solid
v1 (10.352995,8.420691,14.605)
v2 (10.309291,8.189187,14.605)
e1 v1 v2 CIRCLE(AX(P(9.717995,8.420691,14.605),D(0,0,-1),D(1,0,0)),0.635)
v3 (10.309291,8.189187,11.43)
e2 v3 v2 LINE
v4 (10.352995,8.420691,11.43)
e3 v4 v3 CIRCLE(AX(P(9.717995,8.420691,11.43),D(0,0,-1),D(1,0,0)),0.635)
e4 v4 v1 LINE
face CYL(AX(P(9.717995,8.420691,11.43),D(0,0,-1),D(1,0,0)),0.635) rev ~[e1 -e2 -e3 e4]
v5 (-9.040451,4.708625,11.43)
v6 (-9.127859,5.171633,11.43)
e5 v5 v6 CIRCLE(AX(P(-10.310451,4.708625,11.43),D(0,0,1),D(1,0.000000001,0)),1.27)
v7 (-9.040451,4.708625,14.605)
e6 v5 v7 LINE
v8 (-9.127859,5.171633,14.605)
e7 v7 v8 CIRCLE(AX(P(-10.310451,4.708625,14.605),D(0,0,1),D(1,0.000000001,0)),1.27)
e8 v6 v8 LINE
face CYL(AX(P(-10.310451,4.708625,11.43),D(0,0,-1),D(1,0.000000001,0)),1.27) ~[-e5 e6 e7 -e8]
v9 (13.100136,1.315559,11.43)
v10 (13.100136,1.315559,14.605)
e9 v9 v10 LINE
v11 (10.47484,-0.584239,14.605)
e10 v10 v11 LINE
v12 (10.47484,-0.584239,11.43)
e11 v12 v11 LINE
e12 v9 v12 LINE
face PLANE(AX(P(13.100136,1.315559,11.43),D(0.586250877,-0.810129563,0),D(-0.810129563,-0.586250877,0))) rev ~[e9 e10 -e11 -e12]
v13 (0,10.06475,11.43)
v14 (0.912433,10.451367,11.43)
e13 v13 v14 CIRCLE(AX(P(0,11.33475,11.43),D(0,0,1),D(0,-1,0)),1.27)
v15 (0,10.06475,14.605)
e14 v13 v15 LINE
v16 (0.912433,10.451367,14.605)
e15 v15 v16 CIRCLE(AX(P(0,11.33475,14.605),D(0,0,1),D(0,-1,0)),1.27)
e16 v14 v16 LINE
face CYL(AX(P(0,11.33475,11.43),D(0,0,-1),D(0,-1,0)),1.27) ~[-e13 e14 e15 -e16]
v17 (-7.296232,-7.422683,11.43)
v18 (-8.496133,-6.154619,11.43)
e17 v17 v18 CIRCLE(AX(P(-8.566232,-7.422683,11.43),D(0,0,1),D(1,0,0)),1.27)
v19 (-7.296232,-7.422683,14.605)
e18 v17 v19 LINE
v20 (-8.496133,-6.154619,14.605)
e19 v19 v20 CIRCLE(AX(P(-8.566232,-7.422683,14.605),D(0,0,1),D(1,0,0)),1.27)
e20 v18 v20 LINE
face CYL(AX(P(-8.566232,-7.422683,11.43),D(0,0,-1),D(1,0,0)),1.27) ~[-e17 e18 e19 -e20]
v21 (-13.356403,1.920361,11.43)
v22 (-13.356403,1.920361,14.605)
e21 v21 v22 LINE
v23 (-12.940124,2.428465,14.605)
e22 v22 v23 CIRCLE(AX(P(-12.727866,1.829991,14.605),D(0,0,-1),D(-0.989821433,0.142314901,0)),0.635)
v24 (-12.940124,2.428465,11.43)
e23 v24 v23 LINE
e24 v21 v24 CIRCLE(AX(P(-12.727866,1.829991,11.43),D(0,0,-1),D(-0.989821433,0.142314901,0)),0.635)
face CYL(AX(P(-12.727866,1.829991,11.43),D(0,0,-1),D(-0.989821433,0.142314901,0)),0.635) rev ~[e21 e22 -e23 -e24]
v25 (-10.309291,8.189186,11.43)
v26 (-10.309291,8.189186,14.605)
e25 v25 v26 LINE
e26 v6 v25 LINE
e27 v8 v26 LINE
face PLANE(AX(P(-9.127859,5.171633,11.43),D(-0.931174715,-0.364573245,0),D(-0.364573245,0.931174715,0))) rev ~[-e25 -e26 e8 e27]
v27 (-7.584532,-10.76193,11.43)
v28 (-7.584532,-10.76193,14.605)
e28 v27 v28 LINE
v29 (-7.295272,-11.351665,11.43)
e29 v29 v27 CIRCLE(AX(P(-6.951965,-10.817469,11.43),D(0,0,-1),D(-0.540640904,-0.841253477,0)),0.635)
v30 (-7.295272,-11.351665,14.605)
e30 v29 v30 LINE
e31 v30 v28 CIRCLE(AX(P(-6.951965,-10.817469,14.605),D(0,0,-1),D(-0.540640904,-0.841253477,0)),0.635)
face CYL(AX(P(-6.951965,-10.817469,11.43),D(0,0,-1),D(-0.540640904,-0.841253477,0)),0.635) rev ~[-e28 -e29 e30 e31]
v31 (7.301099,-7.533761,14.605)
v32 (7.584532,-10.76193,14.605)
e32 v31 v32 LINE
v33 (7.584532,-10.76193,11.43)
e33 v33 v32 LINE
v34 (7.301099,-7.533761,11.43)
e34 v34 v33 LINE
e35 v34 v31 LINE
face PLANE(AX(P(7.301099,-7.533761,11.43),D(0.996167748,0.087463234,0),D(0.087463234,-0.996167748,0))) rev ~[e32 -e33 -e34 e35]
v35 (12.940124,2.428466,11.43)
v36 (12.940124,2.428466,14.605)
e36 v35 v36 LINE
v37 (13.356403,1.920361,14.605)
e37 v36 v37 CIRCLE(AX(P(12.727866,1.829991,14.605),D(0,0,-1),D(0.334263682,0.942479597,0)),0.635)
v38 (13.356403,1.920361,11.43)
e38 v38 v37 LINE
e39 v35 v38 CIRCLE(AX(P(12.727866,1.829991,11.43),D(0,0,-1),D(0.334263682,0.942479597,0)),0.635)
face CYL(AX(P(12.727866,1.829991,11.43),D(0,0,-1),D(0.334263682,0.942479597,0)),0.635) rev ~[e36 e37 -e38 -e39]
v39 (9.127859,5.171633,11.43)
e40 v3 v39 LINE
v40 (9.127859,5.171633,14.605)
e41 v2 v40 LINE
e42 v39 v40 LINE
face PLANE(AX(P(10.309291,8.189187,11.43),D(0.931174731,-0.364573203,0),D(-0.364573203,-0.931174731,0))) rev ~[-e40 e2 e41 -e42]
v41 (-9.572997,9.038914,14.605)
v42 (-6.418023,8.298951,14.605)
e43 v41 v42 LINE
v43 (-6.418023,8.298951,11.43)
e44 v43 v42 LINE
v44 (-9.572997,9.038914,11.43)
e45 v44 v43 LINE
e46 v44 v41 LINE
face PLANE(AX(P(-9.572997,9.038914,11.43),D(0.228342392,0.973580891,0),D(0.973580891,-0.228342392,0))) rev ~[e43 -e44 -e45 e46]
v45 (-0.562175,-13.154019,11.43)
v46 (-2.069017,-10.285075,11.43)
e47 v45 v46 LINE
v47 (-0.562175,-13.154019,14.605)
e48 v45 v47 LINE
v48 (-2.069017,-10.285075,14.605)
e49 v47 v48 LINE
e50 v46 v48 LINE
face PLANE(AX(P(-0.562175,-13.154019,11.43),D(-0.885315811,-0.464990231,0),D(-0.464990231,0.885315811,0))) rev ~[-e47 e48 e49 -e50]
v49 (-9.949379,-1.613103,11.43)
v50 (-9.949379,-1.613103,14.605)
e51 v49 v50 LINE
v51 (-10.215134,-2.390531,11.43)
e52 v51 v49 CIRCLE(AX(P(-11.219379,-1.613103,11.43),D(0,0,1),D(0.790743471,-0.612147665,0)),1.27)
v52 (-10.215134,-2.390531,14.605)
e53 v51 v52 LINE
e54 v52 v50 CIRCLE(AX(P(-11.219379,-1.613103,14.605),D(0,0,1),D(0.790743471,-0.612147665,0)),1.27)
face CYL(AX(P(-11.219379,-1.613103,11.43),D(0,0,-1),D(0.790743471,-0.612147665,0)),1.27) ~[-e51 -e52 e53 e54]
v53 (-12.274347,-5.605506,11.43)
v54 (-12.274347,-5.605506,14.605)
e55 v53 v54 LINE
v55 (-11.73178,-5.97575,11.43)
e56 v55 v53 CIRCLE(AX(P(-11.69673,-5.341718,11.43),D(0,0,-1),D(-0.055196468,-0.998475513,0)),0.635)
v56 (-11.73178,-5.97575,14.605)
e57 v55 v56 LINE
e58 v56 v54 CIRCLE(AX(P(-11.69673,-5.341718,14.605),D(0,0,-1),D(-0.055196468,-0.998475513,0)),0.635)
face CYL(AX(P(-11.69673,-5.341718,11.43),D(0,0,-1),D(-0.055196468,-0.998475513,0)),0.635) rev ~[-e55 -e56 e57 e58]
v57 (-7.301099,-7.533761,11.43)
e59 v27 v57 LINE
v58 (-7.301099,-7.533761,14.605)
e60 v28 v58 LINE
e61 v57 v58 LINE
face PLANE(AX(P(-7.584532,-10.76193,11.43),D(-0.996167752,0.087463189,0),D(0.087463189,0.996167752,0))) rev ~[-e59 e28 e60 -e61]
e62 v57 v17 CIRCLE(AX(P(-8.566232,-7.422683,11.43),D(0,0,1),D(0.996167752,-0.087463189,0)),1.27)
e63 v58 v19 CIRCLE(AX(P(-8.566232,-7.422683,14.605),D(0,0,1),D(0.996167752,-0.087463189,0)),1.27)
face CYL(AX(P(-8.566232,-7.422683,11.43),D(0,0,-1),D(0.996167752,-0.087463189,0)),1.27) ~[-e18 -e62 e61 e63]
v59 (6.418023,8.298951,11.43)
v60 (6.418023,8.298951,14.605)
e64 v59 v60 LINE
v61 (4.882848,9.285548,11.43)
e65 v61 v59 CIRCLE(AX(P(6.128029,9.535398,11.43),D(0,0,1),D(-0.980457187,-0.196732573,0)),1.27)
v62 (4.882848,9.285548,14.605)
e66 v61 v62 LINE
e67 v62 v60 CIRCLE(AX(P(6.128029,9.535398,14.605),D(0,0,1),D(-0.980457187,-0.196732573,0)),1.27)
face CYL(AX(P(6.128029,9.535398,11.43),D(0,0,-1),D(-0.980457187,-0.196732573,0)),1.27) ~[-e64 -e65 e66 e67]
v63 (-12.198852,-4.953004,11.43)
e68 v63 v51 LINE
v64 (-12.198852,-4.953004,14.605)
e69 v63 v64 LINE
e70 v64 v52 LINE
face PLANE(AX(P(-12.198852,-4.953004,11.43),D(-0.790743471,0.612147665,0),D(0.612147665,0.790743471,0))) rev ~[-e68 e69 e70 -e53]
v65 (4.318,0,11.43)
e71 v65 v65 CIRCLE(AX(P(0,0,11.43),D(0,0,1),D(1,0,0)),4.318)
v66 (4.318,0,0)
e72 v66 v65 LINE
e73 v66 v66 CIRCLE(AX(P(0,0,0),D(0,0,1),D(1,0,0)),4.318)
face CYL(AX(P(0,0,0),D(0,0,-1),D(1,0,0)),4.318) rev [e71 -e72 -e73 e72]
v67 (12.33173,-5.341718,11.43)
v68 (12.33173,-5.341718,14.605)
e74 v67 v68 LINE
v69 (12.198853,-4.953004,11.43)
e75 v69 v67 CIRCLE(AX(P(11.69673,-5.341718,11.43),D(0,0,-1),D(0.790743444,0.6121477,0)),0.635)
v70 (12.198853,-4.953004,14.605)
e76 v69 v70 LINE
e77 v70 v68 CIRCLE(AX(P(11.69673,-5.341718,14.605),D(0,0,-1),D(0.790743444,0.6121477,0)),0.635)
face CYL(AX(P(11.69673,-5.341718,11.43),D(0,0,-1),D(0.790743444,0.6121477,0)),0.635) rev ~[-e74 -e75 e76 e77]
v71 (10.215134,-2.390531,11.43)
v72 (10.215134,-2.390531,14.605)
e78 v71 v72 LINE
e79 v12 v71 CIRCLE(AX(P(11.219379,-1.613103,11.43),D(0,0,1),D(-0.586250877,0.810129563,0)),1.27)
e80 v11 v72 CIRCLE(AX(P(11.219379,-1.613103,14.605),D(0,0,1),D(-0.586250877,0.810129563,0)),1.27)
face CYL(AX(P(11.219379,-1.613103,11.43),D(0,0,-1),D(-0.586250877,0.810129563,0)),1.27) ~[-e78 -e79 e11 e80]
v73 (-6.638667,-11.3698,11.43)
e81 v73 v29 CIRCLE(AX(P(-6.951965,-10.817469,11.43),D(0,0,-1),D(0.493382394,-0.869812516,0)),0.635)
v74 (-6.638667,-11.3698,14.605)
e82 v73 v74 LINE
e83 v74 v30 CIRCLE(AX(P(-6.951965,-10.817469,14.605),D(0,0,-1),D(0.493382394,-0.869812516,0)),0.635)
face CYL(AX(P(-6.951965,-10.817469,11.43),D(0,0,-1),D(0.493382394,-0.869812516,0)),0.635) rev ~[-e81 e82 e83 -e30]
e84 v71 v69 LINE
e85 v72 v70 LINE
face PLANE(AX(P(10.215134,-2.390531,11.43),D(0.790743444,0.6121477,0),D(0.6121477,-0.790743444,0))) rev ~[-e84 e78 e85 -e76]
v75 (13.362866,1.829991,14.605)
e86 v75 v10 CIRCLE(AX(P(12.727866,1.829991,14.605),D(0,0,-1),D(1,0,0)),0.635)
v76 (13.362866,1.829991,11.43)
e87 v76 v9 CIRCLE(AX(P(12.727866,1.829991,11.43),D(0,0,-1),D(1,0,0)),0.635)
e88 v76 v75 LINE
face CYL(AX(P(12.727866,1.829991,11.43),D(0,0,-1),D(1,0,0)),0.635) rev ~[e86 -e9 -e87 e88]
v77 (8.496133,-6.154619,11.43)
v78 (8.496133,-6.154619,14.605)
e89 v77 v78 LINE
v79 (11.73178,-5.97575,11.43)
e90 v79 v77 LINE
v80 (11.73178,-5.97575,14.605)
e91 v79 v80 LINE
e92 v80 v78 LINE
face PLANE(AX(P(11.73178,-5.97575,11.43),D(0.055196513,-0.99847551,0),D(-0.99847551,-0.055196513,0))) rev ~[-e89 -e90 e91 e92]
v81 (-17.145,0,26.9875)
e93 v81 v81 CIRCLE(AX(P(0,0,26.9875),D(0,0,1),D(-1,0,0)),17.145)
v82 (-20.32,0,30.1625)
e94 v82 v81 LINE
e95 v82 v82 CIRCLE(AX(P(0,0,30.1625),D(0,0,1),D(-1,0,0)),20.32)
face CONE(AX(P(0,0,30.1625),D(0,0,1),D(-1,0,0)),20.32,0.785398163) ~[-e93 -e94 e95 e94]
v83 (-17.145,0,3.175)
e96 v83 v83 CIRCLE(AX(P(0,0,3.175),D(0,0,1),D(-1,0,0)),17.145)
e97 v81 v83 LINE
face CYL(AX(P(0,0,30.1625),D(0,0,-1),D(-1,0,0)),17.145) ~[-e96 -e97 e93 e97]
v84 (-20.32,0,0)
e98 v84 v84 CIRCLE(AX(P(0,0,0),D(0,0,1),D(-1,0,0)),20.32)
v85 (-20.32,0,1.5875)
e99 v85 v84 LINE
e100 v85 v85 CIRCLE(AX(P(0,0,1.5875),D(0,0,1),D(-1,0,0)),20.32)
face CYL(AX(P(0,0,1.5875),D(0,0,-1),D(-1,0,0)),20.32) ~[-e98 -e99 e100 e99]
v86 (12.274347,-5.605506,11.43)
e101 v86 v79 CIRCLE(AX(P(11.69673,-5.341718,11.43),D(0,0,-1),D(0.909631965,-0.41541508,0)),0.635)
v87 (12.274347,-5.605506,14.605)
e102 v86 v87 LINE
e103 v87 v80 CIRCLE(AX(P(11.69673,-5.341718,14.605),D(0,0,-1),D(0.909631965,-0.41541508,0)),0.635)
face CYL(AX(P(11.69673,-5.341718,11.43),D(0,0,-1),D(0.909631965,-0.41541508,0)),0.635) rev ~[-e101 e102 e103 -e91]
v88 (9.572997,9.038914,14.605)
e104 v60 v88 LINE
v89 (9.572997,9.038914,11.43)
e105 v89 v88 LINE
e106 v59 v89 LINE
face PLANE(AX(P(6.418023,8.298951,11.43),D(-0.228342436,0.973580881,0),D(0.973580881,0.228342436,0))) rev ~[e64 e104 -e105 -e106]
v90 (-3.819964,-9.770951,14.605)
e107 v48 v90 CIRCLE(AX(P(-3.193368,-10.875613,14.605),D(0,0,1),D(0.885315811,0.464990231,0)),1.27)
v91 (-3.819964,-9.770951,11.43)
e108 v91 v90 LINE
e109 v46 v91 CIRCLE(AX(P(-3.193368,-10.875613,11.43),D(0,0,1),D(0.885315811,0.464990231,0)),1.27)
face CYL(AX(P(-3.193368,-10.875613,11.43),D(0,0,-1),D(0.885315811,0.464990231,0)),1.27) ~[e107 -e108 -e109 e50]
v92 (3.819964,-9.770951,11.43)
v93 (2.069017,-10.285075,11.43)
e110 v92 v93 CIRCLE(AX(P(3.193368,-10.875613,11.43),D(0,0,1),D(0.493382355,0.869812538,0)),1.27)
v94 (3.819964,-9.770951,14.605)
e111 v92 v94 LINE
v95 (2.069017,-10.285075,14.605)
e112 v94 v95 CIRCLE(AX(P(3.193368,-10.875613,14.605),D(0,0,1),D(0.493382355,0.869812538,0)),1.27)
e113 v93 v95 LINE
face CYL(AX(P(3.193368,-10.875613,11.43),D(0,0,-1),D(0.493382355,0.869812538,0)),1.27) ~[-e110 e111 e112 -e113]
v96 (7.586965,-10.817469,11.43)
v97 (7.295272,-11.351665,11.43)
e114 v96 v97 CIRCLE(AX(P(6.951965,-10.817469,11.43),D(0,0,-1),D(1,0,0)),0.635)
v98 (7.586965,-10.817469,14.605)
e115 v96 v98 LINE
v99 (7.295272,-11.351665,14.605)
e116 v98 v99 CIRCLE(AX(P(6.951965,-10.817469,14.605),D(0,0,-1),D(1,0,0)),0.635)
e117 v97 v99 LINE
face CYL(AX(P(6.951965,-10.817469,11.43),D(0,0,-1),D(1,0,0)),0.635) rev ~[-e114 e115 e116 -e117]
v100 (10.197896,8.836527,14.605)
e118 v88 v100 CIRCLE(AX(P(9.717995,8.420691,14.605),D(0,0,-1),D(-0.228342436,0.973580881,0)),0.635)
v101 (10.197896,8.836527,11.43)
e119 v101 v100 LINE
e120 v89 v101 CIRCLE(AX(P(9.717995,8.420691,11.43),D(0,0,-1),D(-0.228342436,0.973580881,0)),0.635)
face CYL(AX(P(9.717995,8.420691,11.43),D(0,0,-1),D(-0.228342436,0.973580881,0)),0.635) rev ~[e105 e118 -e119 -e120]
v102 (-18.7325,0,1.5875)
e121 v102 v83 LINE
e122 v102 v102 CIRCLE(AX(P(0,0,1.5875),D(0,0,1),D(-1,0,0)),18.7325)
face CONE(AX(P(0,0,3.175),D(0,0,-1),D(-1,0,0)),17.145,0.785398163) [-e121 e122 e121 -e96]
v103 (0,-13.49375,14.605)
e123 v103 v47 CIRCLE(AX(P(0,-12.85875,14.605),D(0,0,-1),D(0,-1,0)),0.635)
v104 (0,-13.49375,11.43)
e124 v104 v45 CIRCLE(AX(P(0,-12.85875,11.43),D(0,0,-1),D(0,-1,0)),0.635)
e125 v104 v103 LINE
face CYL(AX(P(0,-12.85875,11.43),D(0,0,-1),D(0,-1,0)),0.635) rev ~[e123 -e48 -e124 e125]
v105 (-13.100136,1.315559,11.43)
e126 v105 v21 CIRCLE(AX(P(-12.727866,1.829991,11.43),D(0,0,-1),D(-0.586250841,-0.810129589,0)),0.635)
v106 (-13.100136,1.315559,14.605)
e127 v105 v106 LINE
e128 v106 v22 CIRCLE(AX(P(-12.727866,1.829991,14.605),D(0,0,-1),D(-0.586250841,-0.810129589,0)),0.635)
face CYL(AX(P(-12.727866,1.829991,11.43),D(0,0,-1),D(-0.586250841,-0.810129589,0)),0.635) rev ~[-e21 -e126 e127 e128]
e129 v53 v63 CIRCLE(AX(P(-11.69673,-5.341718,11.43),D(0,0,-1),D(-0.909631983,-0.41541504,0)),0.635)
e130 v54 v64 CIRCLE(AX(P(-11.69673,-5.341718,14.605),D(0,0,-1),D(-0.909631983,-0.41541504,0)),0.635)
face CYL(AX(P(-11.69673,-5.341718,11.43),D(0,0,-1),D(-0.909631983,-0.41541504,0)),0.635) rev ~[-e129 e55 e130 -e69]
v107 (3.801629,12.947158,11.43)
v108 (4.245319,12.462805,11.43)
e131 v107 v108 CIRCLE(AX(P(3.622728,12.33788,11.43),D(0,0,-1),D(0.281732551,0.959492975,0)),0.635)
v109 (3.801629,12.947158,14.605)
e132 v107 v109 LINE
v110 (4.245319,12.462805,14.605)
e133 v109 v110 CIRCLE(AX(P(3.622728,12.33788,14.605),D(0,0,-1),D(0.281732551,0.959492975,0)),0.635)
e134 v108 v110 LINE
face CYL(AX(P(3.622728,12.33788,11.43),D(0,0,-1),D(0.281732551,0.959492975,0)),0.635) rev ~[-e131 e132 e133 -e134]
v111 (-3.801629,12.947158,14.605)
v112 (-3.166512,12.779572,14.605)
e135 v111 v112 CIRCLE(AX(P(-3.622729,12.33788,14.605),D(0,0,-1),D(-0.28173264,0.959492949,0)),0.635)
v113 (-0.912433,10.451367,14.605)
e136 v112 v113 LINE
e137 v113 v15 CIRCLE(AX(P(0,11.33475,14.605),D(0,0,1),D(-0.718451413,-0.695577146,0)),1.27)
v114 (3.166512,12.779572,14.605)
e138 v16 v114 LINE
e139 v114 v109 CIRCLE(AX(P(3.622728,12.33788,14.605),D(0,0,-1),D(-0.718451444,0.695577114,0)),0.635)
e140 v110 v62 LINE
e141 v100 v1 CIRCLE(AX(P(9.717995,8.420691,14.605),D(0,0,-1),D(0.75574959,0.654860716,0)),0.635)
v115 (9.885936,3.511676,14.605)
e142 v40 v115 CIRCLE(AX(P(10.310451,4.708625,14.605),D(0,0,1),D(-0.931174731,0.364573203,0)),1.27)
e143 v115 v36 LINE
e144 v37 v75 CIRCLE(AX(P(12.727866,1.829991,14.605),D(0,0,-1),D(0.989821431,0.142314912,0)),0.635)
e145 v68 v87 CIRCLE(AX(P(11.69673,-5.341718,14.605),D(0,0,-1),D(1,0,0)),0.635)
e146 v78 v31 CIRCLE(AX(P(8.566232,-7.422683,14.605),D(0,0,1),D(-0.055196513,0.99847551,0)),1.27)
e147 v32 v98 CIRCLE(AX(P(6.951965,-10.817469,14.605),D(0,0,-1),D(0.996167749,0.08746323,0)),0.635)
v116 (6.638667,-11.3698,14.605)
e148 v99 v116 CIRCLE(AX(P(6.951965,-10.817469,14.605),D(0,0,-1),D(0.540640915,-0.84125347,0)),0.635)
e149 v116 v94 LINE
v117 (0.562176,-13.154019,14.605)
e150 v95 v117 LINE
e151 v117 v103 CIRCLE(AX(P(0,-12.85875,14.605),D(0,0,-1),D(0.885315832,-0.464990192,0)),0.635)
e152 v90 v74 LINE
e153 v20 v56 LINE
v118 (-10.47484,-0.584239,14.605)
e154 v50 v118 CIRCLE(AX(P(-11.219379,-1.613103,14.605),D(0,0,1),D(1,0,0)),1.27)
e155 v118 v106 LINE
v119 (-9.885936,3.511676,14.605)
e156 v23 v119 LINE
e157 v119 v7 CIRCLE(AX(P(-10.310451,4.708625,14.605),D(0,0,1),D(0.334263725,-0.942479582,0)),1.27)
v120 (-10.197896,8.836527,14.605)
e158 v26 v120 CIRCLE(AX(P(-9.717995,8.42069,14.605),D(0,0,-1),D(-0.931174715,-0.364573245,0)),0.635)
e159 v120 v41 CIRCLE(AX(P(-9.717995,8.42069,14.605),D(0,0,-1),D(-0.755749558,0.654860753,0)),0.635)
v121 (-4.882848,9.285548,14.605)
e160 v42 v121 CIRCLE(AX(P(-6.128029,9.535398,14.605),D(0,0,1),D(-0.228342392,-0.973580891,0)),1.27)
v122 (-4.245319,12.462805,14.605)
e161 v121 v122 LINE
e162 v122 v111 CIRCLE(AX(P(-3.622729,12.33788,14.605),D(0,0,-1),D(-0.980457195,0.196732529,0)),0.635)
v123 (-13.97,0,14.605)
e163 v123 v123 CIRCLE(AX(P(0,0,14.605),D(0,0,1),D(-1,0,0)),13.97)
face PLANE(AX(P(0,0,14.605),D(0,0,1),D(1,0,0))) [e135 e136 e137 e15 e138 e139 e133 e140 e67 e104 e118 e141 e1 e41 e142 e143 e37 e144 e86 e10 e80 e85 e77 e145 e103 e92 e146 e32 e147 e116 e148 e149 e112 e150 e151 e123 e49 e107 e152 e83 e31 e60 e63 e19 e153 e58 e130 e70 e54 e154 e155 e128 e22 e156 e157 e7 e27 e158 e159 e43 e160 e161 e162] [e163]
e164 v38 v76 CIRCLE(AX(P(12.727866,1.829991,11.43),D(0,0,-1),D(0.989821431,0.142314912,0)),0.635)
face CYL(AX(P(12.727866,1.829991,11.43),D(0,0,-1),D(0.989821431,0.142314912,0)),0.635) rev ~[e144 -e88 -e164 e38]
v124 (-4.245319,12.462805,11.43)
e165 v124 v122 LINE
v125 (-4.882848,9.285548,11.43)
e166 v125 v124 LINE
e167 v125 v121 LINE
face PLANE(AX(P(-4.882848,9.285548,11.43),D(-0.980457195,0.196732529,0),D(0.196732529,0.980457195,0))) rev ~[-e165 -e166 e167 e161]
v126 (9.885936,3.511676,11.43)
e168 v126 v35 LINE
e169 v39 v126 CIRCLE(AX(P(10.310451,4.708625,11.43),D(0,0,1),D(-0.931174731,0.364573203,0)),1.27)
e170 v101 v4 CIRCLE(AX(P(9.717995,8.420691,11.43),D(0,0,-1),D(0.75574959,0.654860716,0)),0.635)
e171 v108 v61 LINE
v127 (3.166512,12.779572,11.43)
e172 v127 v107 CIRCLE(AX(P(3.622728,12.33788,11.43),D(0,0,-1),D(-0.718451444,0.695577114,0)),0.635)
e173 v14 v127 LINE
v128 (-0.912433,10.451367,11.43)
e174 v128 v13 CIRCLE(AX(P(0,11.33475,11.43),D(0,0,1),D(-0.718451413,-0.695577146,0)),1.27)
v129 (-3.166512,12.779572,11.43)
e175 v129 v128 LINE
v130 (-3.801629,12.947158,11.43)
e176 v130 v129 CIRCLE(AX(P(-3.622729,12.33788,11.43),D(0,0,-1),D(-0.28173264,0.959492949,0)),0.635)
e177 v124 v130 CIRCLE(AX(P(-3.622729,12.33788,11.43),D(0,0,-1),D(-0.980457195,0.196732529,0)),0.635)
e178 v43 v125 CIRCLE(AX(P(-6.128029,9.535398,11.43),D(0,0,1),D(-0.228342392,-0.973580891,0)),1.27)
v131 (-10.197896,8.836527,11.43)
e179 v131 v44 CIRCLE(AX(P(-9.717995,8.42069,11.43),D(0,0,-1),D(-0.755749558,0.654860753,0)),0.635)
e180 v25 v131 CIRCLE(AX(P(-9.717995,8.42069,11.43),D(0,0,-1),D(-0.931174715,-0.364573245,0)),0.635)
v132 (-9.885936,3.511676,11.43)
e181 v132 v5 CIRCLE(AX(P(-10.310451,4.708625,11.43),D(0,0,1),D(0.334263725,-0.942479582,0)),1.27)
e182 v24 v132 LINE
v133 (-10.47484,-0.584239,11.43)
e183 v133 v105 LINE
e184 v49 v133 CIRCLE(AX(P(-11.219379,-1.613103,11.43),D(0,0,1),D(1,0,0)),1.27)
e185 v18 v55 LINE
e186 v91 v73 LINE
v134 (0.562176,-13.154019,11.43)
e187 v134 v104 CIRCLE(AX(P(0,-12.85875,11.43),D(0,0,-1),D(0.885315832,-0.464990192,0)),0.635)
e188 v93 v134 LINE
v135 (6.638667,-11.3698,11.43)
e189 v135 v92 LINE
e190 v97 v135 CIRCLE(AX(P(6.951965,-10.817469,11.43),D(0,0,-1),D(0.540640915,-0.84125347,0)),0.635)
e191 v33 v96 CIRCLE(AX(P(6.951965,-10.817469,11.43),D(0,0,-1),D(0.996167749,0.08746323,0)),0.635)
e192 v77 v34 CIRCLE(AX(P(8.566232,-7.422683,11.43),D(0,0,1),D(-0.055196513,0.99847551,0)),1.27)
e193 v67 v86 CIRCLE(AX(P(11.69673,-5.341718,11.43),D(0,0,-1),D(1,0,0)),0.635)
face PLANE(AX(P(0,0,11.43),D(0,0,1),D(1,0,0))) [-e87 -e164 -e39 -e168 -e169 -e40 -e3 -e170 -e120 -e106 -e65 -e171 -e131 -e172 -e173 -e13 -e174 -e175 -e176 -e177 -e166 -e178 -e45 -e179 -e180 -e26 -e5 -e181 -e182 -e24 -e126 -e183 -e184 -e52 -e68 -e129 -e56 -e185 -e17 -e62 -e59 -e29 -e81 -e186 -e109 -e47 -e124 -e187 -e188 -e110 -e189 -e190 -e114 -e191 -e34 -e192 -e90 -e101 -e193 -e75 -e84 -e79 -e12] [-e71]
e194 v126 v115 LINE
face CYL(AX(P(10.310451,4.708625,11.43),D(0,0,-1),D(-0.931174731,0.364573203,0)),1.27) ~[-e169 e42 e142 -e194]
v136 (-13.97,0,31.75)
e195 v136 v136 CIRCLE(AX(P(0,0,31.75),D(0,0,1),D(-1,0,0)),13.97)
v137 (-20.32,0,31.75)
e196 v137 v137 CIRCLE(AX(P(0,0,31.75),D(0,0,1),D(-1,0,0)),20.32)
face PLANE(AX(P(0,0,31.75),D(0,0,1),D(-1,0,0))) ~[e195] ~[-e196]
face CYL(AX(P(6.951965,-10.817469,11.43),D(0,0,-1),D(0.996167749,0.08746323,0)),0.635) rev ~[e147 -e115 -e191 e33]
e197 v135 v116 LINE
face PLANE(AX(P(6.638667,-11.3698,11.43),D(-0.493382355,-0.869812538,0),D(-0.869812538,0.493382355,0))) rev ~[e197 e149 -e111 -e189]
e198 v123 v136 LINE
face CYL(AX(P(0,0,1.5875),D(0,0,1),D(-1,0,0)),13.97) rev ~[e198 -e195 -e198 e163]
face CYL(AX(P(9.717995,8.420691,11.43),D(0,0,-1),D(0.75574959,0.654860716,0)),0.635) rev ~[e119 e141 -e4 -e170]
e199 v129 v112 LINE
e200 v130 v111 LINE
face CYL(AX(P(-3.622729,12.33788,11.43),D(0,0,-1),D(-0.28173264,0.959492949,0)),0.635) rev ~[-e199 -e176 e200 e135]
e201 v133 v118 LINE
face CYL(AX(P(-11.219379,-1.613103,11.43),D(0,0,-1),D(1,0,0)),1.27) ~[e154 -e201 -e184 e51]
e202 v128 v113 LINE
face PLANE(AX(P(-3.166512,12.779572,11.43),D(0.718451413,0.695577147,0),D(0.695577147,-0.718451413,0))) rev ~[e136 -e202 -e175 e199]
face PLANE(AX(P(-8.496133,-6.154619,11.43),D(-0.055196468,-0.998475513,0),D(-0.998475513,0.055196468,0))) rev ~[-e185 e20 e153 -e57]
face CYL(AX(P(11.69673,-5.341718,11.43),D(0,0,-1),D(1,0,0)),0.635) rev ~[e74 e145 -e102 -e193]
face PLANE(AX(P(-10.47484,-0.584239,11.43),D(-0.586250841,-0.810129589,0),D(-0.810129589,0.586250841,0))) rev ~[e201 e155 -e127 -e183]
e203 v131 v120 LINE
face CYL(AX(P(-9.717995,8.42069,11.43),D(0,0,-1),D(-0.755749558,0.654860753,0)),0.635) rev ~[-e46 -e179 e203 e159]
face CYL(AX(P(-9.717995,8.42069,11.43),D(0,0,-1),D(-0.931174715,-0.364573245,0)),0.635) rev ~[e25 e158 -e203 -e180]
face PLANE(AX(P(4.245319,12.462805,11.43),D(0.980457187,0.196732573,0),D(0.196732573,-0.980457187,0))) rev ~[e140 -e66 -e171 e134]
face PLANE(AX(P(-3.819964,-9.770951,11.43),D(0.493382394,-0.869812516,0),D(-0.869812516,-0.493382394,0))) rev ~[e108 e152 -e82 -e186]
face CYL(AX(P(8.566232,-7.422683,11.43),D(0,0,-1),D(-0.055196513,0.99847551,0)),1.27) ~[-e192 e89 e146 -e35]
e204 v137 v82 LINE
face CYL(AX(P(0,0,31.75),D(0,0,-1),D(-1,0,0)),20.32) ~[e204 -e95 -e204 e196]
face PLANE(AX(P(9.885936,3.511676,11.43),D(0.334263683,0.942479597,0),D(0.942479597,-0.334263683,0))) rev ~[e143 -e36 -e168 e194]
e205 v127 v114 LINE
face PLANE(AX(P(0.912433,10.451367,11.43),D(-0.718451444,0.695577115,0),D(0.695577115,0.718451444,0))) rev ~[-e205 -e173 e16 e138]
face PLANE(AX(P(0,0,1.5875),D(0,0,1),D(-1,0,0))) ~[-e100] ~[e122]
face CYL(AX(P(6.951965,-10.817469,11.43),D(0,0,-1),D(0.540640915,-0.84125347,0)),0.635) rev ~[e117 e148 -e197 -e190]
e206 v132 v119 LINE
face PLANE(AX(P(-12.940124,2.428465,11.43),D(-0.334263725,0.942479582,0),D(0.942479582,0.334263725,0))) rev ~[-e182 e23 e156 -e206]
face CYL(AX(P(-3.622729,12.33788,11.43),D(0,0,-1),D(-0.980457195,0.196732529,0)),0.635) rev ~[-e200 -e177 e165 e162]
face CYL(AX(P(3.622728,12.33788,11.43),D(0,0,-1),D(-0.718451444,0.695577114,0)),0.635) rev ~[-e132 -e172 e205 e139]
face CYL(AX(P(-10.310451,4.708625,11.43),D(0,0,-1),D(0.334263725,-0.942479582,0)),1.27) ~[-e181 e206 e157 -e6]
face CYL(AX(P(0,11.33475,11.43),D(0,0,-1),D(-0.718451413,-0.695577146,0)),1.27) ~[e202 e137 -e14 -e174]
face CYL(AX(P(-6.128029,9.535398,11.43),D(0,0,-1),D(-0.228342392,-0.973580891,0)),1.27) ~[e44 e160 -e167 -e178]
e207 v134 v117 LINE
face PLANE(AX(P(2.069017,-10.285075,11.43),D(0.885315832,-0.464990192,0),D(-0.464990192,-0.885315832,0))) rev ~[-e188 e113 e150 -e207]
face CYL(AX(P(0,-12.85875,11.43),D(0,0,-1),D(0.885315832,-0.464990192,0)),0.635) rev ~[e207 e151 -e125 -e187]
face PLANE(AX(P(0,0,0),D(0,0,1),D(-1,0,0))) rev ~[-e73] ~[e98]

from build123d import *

# Parameters (mm, degrees)
F0_R     = 15.875
F0_R_2   = 4.318
F1_DEPTH = 11.43
F5_SIZE  = 1.5875
F4_R     = 15.875
F4_R_2   = 13.97
F6_DEPTH = 3.175


with BuildPart() as f1:
    # F0 (on Top) → F1 (new body)
    with BuildSketch(Plane.XY):
        Circle(F0_R)
        Circle(F0_R_2, mode=Mode.SUBTRACT)
    extrude(amount=F1_DEPTH)

    # F2 (on Front) → F3 (revolve)
    with BuildSketch(Plane.XZ):
        Polygon((-20.32, 0), (-10.16, 0), (-10.16, 1.5875), (-13.97, 1.5875), (-13.97, 31.75), (-20.32, 31.75), (-20.32, 30.1625), (-17.145, 30.1625), (-17.145, 26.9875), (-17.145, 1.5875), (-20.32, 1.5875), align=None)
        Polygon((-20.32, 30.1625), (-17.145, 26.9875), (-17.145, 30.1625), align=None)
    revolve(axis=Axis((0, 0, 11.5776285529), (0, 0, 1)))

    # F5
    f5_edges = [f1.edges().sort_by_distance(p)[0] for p in [
        (17.145, 0, 1.5875),
    ]]
    chamfer(f5_edges, length=F5_SIZE)

    # F4 (on face) → F6 (join)
    with BuildSketch(Plane.XY.offset(11.43)):
        Circle(F4_R)
        Circle(F4_R_2, mode=Mode.SUBTRACT)
        Circle(F4_R_2)
        with BuildLine():
            ThreePointArc((0, 13.49375), (1.9203608066, 13.3564030875), (3.8016286067, 12.9471583368))
            ThreePointArc((3.8016286067, 12.9471583368), (7.2952719665, 11.3516648998), (10.1978957754, 8.836527079))
            ThreePointArc((10.1978957754, 8.836527079), (12.2743466965, 5.6055064211), (13.3564030629, 1.9203609777))
            ThreePointArc((13.3564030629, 1.9203609777), (13.4593694669, 0.9626331682), (13.49375, 0))
            ThreePointArc((13.49375, 0), (13.1853755264, -2.8683028589), (12.2743467518, -5.6055063))
            ThreePointArc((12.2743467518, -5.6055063), (10.197895881, -8.836526957), (7.2952721608, -11.3516647749))
            ThreePointArc((7.2952721608, -11.3516647749), (3.8016288023, -12.9471582794), (8.16e-08, -13.49375))
            ThreePointArc((8.16e-08, -13.49375), (-3.8016286419, -12.9471583265), (-7.2952720168, -11.3516648675))
            ThreePointArc((-7.2952720168, -11.3516648675), (-10.1978957807, -8.8365270728), (-12.2743466957, -5.6055064229))
            ThreePointArc((-12.2743466957, -5.6055064229), (-13.3564030713, -1.920360919), (-13.3564030873, 1.9203608081))
            ThreePointArc((-13.3564030873, 1.9203608081), (-12.2743467595, 5.6055062831), (-10.1978958619, 8.8365269791))
            ThreePointArc((-10.1978958619, 8.8365269791), (-7.2952721155, 11.3516648041), (-3.8016288198, 12.9471582743))
            ThreePointArc((-3.8016288198, 12.9471582743), (-1.9203609165, 13.3564030717), (0, 13.49375))
        make_face(mode=Mode.SUBTRACT)
        with BuildLine():
            ThreePointArc((10.1978957754, 8.836527079), (7.2952719665, 11.3516648998), (3.8016286067, 12.9471583368))
            ThreePointArc((3.8016286067, 12.9471583368), (4.0909657389, 12.766807831), (4.2453187505, 12.462805481))
            Line((4.2453187505, 12.462805481), (4.8828478786, 9.2855481142))
            ThreePointArc((4.8828478786, 9.2855481142), (6.002488465, 10.799178406), (7.3980285057, 9.5353984813))
            ThreePointArc((7.3980285057, 9.5353984813), (7.1233157795, 8.7465364892), (6.4180233992, 8.2989507623))
            Line((6.4180233992, 8.2989507623), (9.572997339, 9.0389143838))
            ThreePointArc((9.572997339, 9.0389143838), (9.9136481809, 9.0247970952), (10.1978957754, 8.836527079))
        make_face()
        with BuildLine():
            ThreePointArc((13.3564030629, 1.9203609777), (12.2743466965, 5.6055064211), (10.1978957754, 8.836527079))
            ThreePointArc((10.1978957754, 8.836527079), (10.3129578638, 8.6426002713), (10.3529947858, 8.4206905243))
            ThreePointArc((10.3529947858, 8.4206905243), (10.3419731231, 8.302893943), (10.3092907399, 8.1891865402))
            Line((10.3092907399, 8.1891865402), (9.1278593511, 5.1716332867))
            ThreePointArc((9.1278593511, 5.1716332867), (10.5460444219, 5.9565819932), (11.5804512593, 4.7086253186))
            ThreePointArc((11.5804512593, 4.7086253186), (11.0431742993, 3.6713129516), (9.8859363825, 3.5116762306))
            Line((9.8859363825, 3.5116762306), (12.9401238926, 2.4284655514))
            ThreePointArc((12.9401238926, 2.4284655514), (13.2190652142, 2.2324196075), (13.3564030629, 1.9203609777))
        make_face()
        with BuildLine():
            ThreePointArc((-4.2453189127, 12.4628054073), (-4.090965925, 12.7668077529), (-3.8016288198, 12.9471582743))
            ThreePointArc((-3.8016288198, 12.9471582743), (-7.2952721155, 11.3516648041), (-10.1978958619, 8.8365269791))
            ThreePointArc((-10.1978958619, 8.8365269791), (-9.9136482865, 9.0247969722), (-9.5729974735, 9.0389142669))
            Line((-9.5729974735, 9.0389142669), (-6.4180233441, 8.2989507494))
            ThreePointArc((-6.4180233441, 8.2989507494), (-6.9168905199, 10.5306857375), (-4.8580285057, 9.5353984813))
            ThreePointArc((-4.8580285057, 9.5353984813), (-4.8642485781, 9.4098584688), (-4.8828478674, 9.2855481697))
            Line((-4.8828478674, 9.2855481697), (-4.2453189127, 12.4628054073))
        make_face()
        with BuildLine():
            ThreePointArc((13.49375, 0), (13.4593694669, 0.9626331682), (13.3564030629, 1.9203609777))
            ThreePointArc((13.3564030629, 1.9203609777), (13.3612485452, 1.8752914129), (13.3628664542, 1.8299910074))
            ThreePointArc((13.3628664542, 1.8299910074), (13.2933821525, 1.541171003), (13.1001357613, 1.315558735))
            Line((13.1001357613, 1.315558735), (10.474839974, -0.5842385682))
            ThreePointArc((10.474839974, -0.5842385682), (11.7970185973, -0.4820717165), (12.4893785884, -1.6131031131))
            ThreePointArc((12.4893785884, -1.6131031131), (11.6301765314, -2.8148289762), (10.2151344151, -2.390530692))
            Line((10.2151344151, -2.390530692), (12.1988525408, -4.9530039347))
            ThreePointArc((12.1988525408, -4.9530039347), (12.2975933857, -5.1363187527), (12.3317304542, -5.3417177242))
            ThreePointArc((12.3317304542, -5.3417177242), (12.3172187091, -5.4766967059), (12.2743467518, -5.6055063))
            ThreePointArc((12.2743467518, -5.6055063), (13.1853755264, -2.8683028589), (13.49375, 0))
        make_face()
        with BuildLine():
            ThreePointArc((-10.3092908365, 8.1891863905), (-10.3437969109, 8.5283789982), (-10.1978958619, 8.8365269791))
            ThreePointArc((-10.1978958619, 8.8365269791), (-12.2743467595, 5.6055062831), (-13.3564030873, 1.9203608081))
            ThreePointArc((-13.3564030873, 1.9203608081), (-13.219065249, 2.2324194318), (-12.9401239425, 2.4284653804))
            Line((-12.9401239425, 2.4284653804), (-9.8859363292, 3.5116762495))
            ThreePointArc((-9.8859363292, 3.5116762495), (-11.4656839052, 5.2362023594), (-9.1278593717, 5.1716333395))
            Line((-9.1278593717, 5.1716333395), (-10.3092908365, 8.1891863905))
        make_face()
        with BuildLine():
            ThreePointArc((-13.1001357616, 1.3155585568), (-13.3125454921, 1.5822501552), (-13.3564030873, 1.9203608081))
            ThreePointArc((-13.3564030873, 1.9203608081), (-13.3564030713, -1.920360919), (-12.2743466957, -5.6055064229))
            ThreePointArc((-12.2743466957, -5.6055064229), (-12.3275224114, -5.2687355378), (-12.1988524903, -4.9530041056))
            Line((-12.1988524903, -4.9530041056), (-10.2151343804, -2.3905306473))
            ThreePointArc((-10.2151343804, -2.3905306473), (-12.4764518155, -1.7938429858), (-10.4748400199, -0.584238535))
            Line((-10.4748400199, -0.584238535), (-13.1001357616, 1.3155585568))
        make_face()
        with BuildLine():
            ThreePointArc((7.2952721608, -11.3516647749), (10.197895881, -8.836526957), (12.2743467518, -5.6055063))
            ThreePointArc((12.2743467518, -5.6055063), (12.054654987, -5.8662318125), (11.7317802397, -5.9757496733))
            Line((11.7317802397, -5.9757496733), (8.4961329169, -6.1546188058))
            ThreePointArc((8.4961329169, -6.1546188058), (9.439122385, -6.5002060227), (9.8362324879, -7.4226827041))
            ThreePointArc((9.8362324879, -7.4226827041), (8.6218249278, -8.6914653808), (7.3010994475, -7.5337610106))
            Line((7.3010994475, -7.5337610106), (7.5845317003, -10.7619296679))
            ThreePointArc((7.5845317003, -10.7619296679), (7.5863565184, -10.7896726012), (7.5869651801, -10.8174688212))
            ThreePointArc((7.5869651801, -10.8174688212), (7.509291356, -11.1217918956), (7.2952721608, -11.3516647749))
        make_face()
        with BuildLine():
            ThreePointArc((-11.7317801436, -5.9757498234), (-12.0546549192, -5.866231961), (-12.2743466957, -5.6055064229))
            ThreePointArc((-12.2743466957, -5.6055064229), (-10.1978957807, -8.8365270728), (-7.2952720168, -11.3516648675))
            ThreePointArc((-7.2952720168, -11.3516648675), (-7.52207831, -11.0971041407), (-7.5845315655, -10.7619297844))
            Line((-7.5845315655, -10.7619297844), (-7.3010994426, -7.5337609542))
            ThreePointArc((-7.3010994426, -7.5337609542), (-9.5260344288, -8.2543558576), (-8.4961329734, -6.1546188027))
            Line((-8.4961329734, -6.1546188027), (-11.7317801436, -5.9757498234))
        make_face()
        with BuildLine():
            ThreePointArc((8.16e-08, -13.49375), (3.8016288023, -12.9471582794), (7.2952721608, -11.3516647749))
            ThreePointArc((7.2952721608, -11.3516647749), (6.9694967924, -11.4522267613), (6.6386673847, -11.369799783))
            Line((6.6386673847, -11.369799783), (3.8199636894, -9.770951059))
            ThreePointArc((3.8199636894, -9.770951059), (4.2907915357, -10.2364245911), (4.4633680987, -10.8756129827))
            ThreePointArc((4.4633680987, -10.8756129827), (2.8892512665, -12.1086632462), (2.0690169925, -10.2850754393))
            Line((2.0690169925, -10.2850754393), (0.5621756347, -13.1540187717))
            ThreePointArc((0.5621756347, -13.1540187717), (0.3284276459, -13.4022206386), (8.16e-08, -13.49375))
        make_face()
        with BuildLine():
            ThreePointArc((-6.6386672228, -11.3697998573), (-6.969496637, -11.4522268501), (-7.2952720168, -11.3516648675))
            ThreePointArc((-7.2952720168, -11.3516648675), (-3.8016286419, -12.9471583265), (8.16e-08, -13.49375))
            ThreePointArc((8.16e-08, -13.49375), (-0.3284274706, -13.4022206459), (-0.5621754583, -13.1540187967))
            Line((-0.5621754583, -13.1540187967), (-2.0690170188, -10.2850753892))
            ThreePointArc((-2.0690170188, -10.2850753892), (-1.9603178419, -10.571496123), (-1.9233680987, -10.8756129827))
            ThreePointArc((-1.9233680987, -10.8756129827), (-3.8325564657, -11.973036434), (-3.8199637387, -9.7709510869))
            Line((-3.8199637387, -9.7709510869), (-6.6386672228, -11.3697998573))
        make_face()
        with BuildLine():
            ThreePointArc((7.3980285057, 9.5353984813), (6.002488465, 10.799178406), (4.8828478786, 9.2855481142))
            ThreePointArc((4.8828478786, 9.2855481142), (5.4414146913, 8.4670064793), (6.4180233992, 8.2989507623))
            ThreePointArc((6.4180233992, 8.2989507623), (7.1233157795, 8.7465364892), (7.3980285057, 9.5353984813))
        make_face()
        with BuildLine():
            ThreePointArc((-6.4180233441, 8.2989507494), (-5.4414146437, 8.4670065099), (-4.8828478674, 9.2855481697))
            ThreePointArc((-4.8828478674, 9.2855481697), (-4.8642485781, 9.4098584688), (-4.8580285057, 9.5353984813))
            ThreePointArc((-4.8580285057, 9.5353984813), (-6.9168905199, 10.5306857375), (-6.4180233441, 8.2989507494))
        make_face()
        with BuildLine():
            ThreePointArc((9.1278593511, 5.1716332867), (9.155218637, 4.1810482264), (9.8859363825, 3.5116762306))
            ThreePointArc((9.8859363825, 3.5116762306), (11.0431742993, 3.6713129516), (11.5804512593, 4.7086253186))
            ThreePointArc((11.5804512593, 4.7086253186), (10.5460444219, 5.9565819932), (9.1278593511, 5.1716332867))
        make_face()
        with BuildLine():
            ThreePointArc((-9.0404512593, 4.7086253186), (-9.06249459, 4.944218509), (-9.1278593717, 5.1716333395))
            ThreePointArc((-9.1278593717, 5.1716333395), (-11.4656839052, 5.2362023594), (-9.8859363292, 3.5116762495))
            ThreePointArc((-9.8859363292, 3.5116762495), (-9.273138876, 3.9759023018), (-9.0404512593, 4.7086253186))
        make_face()
        with BuildLine():
            ThreePointArc((12.4893785884, -1.6131031131), (11.7970185973, -0.4820717165), (10.474839974, -0.5842385682))
            ThreePointArc((10.474839974, -0.5842385682), (9.9623053531, -1.4323632965), (10.2151344151, -2.390530692))
            ThreePointArc((10.2151344151, -2.390530692), (11.6301765314, -2.8148289762), (12.4893785884, -1.6131031131))
        make_face()
        with BuildLine():
            ThreePointArc((-9.9493785884, -1.6131031131), (-10.0883472046, -1.035463079), (-10.4748400199, -0.584238535))
            ThreePointArc((-10.4748400199, -0.584238535), (-12.4764518155, -1.7938429858), (-10.2151343804, -2.3905306473))
            ThreePointArc((-10.2151343804, -2.3905306473), (-10.0176527161, -2.0239010293), (-9.9493785884, -1.6131031131))
        make_face()
        with BuildLine():
            ThreePointArc((9.8362324879, -7.4226827041), (9.439122385, -6.5002060227), (8.4961329169, -6.1546188058))
            ThreePointArc((8.4961329169, -6.1546188058), (7.6064305099, -6.5910095934), (7.3010994475, -7.5337610106))
            ThreePointArc((7.3010994475, -7.5337610106), (8.6218249278, -8.6914653808), (9.8362324879, -7.4226827041))
        make_face()
        with BuildLine():
            ThreePointArc((-7.2962324879, -7.4226827041), (-7.643755826, -6.5497927865), (-8.4961329734, -6.1546188027))
            ThreePointArc((-8.4961329734, -6.1546188027), (-9.5260344288, -8.2543558576), (-7.3010994426, -7.5337609542))
            ThreePointArc((-7.3010994426, -7.5337609542), (-7.29744981, -7.4782751157), (-7.2962324879, -7.4226827041))
        make_face()
        with BuildLine():
            ThreePointArc((4.4633680987, -10.8756129827), (4.2907915357, -10.2364245911), (3.8199636894, -9.770951059))
            ThreePointArc((3.8199636894, -9.770951059), (2.8355677243, -9.6570569142), (2.0690169925, -10.2850754393))
            ThreePointArc((2.0690169925, -10.2850754393), (2.8892512665, -12.1086632462), (4.4633680987, -10.8756129827))
        make_face()
        with BuildLine():
            ThreePointArc((-2.0690170188, -10.2850753892), (-2.8355677786, -9.6570568982), (-3.8199637387, -9.7709510869))
            ThreePointArc((-3.8199637387, -9.7709510869), (-3.8325564657, -11.973036434), (-1.9233680987, -10.8756129827))
            ThreePointArc((-1.9233680987, -10.8756129827), (-1.9603178419, -10.571496123), (-2.0690170188, -10.2850753892))
        make_face()
        with BuildLine():
            ThreePointArc((3.1665117699, 12.7795717652), (3.4607178673, 12.9518652935), (3.8016286067, 12.9471583368))
            ThreePointArc((3.8016286067, 12.9471583368), (1.9203608066, 13.3564030875), (0, 13.49375))
            Line((0, 13.49375), (0, 12.60475))
            ThreePointArc((0, 12.60475), (0.8980256121, 12.2327756121), (1.27, 11.33475))
            ThreePointArc((1.27, 11.33475), (1.177219252, 10.8582472899), (0.9124333342, 10.4513670646))
            Line((0.9124333342, 10.4513670646), (3.1665117699, 12.7795717652))
        make_face()
        with BuildLine():
            Line((0, 12.60475), (0, 13.49375))
            ThreePointArc((0, 13.49375), (-1.9203609165, 13.3564030717), (-3.8016288198, 12.9471582743))
            ThreePointArc((-3.8016288198, 12.9471582743), (-3.4607180661, 12.9518652586), (-3.1665119462, 12.7795717395))
            Line((-3.1665119462, 12.7795717395), (-0.9124332948, 10.4513670239))
            ThreePointArc((-0.9124332948, 10.4513670239), (-1.1693580247, 11.8302313924), (0, 12.60475))
        make_face()
        with BuildLine():
            ThreePointArc((1.27, 11.33475), (0.8980256121, 12.2327756121), (0, 12.60475))
            Line((0, 12.60475), (0, 10.06475))
            ThreePointArc((0, 10.06475), (0.4954814184, 10.1653919864), (0.9124333342, 10.4513670646))
            ThreePointArc((0.9124333342, 10.4513670646), (1.177219252, 10.8582472899), (1.27, 11.33475))
        make_face()
        with BuildLine():
            Line((0, 10.06475), (0, 12.60475))
            ThreePointArc((0, 12.60475), (-1.1693580247, 11.8302313924), (-0.9124332948, 10.4513670239))
            ThreePointArc((-0.9124332948, 10.4513670239), (-0.4954813924, 10.1653919753), (0, 10.06475))
        make_face()
    extrude(amount=F6_DEPTH)


solid = f1.part
